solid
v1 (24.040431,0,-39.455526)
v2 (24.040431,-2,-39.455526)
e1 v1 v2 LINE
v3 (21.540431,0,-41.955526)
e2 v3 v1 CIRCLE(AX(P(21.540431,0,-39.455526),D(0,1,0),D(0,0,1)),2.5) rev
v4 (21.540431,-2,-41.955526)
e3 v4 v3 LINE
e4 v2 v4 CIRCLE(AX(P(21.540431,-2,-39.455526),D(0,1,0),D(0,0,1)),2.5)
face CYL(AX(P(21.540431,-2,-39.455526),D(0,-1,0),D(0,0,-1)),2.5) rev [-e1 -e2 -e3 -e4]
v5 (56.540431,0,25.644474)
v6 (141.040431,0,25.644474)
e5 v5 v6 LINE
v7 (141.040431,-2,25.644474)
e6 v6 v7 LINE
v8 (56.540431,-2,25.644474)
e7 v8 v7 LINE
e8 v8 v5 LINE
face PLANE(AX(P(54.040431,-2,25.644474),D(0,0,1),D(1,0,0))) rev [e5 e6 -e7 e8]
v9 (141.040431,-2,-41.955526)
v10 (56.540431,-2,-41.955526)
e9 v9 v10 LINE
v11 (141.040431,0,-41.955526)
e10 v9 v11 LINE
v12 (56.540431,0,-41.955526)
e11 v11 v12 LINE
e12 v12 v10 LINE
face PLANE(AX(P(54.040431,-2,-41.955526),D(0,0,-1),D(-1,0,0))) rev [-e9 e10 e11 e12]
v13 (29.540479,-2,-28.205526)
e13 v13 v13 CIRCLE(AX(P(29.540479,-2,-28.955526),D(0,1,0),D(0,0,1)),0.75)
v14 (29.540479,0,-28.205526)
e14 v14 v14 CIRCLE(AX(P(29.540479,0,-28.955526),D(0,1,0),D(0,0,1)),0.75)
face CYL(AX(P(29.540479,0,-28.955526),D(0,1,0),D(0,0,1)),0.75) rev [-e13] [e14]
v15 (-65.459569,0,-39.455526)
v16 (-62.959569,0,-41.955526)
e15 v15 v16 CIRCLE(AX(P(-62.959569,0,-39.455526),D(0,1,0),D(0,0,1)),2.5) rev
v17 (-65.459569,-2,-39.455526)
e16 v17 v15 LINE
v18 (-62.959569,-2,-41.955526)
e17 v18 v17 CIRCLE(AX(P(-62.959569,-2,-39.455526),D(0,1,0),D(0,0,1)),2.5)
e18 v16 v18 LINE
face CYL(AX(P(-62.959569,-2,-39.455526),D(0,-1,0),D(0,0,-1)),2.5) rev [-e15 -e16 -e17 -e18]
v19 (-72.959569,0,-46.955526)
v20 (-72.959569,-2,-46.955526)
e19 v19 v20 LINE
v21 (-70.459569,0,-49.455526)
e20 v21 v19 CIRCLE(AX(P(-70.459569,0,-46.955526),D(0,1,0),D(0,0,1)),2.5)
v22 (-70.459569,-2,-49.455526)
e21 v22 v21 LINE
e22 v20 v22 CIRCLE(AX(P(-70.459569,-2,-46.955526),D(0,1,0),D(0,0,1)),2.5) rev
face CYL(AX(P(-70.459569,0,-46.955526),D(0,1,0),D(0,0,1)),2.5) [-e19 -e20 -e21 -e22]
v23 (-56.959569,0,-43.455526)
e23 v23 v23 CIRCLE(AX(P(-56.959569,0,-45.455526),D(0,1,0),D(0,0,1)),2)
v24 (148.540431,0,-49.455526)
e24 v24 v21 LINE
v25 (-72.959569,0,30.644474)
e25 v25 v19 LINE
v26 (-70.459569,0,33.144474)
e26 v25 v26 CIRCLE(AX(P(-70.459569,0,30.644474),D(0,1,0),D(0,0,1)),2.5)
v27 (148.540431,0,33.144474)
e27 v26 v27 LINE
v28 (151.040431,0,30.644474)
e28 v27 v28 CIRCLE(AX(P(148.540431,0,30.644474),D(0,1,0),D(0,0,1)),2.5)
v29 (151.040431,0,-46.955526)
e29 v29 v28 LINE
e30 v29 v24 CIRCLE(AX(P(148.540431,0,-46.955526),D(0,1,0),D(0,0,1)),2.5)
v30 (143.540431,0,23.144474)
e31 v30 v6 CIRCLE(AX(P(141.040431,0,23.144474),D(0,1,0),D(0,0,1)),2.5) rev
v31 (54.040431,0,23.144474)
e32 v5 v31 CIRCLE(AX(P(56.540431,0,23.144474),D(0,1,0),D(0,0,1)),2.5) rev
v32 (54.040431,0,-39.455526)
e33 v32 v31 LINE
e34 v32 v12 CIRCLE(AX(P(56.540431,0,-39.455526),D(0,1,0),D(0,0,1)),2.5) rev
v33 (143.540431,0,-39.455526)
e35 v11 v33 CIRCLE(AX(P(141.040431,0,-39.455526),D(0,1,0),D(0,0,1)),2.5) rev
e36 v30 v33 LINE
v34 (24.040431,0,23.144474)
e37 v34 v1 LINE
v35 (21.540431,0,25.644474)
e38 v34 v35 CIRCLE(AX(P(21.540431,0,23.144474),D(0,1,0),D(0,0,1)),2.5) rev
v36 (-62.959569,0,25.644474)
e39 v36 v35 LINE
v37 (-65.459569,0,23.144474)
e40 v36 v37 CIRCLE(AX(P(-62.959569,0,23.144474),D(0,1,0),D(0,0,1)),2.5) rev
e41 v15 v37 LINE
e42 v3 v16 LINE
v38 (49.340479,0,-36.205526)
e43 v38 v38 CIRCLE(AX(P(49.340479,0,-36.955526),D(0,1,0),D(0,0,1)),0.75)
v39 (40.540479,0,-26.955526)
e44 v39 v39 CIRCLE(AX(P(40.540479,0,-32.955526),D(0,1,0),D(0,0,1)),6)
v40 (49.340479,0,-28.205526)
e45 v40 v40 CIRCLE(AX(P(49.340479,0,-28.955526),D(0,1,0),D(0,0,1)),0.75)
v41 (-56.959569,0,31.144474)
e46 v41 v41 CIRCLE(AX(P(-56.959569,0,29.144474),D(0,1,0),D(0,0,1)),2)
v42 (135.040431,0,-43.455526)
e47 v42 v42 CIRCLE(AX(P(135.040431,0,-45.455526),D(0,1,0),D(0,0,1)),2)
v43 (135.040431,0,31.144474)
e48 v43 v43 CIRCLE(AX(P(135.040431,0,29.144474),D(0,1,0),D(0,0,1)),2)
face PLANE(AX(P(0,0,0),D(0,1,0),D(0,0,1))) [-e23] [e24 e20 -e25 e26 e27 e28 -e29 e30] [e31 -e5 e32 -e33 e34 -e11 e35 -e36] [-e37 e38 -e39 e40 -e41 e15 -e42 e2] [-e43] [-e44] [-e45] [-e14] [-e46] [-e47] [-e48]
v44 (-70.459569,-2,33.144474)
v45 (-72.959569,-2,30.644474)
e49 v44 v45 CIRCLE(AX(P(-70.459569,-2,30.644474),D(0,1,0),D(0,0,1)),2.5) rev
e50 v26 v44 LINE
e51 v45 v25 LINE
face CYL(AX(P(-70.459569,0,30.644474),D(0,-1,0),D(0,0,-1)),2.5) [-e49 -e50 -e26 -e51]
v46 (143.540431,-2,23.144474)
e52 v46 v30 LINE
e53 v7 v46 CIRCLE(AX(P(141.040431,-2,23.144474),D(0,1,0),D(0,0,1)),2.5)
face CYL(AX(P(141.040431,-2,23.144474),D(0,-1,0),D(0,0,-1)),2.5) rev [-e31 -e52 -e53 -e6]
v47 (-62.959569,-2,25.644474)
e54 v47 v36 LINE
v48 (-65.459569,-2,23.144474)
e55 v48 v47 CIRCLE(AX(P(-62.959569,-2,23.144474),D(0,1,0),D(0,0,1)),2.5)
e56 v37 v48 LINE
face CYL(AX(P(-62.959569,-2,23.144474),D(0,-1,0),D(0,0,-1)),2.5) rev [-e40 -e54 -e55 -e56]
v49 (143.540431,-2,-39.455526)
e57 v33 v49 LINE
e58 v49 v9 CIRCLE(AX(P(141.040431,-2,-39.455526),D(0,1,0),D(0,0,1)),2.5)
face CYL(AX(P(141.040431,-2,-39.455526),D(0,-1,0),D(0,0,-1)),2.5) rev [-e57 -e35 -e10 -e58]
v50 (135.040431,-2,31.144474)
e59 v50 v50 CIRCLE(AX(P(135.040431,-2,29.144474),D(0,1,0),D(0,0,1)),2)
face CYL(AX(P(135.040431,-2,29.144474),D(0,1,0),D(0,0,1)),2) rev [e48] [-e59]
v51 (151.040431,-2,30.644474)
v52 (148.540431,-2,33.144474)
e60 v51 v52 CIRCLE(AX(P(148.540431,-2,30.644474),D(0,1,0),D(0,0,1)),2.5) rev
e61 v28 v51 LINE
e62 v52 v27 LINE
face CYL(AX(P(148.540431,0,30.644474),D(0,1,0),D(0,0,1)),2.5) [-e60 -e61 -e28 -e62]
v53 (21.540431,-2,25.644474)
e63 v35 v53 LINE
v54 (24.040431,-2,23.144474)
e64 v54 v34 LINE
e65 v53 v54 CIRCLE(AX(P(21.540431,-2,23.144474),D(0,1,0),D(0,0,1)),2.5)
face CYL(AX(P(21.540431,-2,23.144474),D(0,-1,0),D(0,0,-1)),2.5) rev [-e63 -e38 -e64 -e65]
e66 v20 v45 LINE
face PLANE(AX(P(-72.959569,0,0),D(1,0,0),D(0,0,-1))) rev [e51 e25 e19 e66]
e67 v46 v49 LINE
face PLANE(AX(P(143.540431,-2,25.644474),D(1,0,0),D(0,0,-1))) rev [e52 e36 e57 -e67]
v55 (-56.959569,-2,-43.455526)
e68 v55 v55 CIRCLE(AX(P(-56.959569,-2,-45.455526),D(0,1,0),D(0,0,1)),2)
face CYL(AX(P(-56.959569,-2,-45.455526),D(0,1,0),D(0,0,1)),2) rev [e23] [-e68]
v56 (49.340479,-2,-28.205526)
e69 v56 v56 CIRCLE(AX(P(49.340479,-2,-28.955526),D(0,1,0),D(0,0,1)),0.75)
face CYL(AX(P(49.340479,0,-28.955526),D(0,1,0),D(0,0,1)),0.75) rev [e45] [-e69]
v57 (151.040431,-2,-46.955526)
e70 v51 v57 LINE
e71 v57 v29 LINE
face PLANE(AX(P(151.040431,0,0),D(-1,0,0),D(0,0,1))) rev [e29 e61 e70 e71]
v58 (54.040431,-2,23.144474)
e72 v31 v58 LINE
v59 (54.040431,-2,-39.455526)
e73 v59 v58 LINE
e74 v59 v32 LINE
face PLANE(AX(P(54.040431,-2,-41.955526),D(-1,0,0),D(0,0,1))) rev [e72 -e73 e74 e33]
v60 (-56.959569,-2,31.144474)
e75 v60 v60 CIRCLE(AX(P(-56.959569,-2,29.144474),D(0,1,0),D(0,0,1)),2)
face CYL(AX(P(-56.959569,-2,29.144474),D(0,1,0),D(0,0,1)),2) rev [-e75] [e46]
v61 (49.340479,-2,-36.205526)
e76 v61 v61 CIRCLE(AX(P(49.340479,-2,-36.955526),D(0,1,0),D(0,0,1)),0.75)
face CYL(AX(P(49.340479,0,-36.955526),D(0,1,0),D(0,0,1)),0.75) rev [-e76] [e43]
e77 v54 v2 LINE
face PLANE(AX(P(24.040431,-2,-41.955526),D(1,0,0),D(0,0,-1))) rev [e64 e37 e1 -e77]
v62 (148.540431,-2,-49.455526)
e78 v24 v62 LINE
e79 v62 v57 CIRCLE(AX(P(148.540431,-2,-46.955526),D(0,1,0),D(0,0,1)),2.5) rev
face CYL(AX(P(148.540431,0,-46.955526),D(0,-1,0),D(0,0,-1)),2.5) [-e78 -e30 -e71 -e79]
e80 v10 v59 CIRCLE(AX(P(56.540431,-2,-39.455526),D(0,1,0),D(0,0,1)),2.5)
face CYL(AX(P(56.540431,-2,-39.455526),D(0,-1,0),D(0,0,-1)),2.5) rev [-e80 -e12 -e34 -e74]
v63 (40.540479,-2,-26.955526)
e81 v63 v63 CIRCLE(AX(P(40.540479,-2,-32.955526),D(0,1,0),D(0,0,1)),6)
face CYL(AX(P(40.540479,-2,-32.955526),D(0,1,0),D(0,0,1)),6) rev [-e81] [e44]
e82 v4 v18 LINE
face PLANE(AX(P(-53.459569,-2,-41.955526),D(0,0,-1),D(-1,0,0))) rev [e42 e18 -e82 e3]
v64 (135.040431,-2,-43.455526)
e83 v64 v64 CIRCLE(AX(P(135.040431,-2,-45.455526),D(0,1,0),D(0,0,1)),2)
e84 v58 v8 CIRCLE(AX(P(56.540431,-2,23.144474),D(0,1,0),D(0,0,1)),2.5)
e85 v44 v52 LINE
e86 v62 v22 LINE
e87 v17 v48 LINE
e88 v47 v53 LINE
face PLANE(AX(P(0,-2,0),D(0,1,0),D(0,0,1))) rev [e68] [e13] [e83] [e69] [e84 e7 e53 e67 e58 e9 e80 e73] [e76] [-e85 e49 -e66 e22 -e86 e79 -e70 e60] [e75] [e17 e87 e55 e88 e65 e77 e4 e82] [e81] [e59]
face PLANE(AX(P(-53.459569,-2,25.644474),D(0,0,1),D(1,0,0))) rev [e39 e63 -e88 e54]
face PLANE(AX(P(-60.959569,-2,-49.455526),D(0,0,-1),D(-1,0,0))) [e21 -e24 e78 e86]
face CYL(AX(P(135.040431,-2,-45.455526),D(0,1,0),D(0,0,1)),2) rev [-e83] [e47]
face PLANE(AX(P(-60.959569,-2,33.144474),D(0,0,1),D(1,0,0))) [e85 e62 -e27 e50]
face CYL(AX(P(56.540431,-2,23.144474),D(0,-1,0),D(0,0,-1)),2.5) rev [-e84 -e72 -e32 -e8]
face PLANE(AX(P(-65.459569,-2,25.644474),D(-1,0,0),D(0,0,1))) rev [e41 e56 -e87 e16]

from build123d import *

# Parameters (mm, degrees)
SKETCH1_W             = 200
SKETCH1_H             = 82.6
BASE_FLANGE1_DEPTH    = 2
SKETCH6_R             = 2
CUT_EXTRUDE1_DEPTH    = 148.587569056
SKETCH7_W             = 77.5
SKETCH7_H             = 67.6
CUT_EXTRUDE2_DEPTH    = 148.587569056
SKETCH8_W             = 82.6
SKETCH8_H             = 2
BOSS_EXTRUDE1_DEPTH   = 12
SKETCH9_W             = 82.6
SKETCH9_H             = 2
BOSS_EXTRUDE2_DEPTH   = 12
SKETCH10_W            = 12
SKETCH10_H            = 67.6
CUT_EXTRUDE3_DEPTH    = 159.943577694
FILLET1_R             = 2.5
SKETCH11_R            = 6
CUT_EXTRUDE4_DEPTH    = 159.943577694
F_1_5MM_DOWEL_HOLE1_D = 1.5


# Sheet-metal steps are written as plain solids
with BuildPart() as part:
    # Sketch1 → Base-Flange1 (new body)
    with BuildSketch(Plane(origin=(0, 0, 0), x_dir=(1, 0, 0), z_dir=(0, 1, 0))):
        with Locations((39.040431267, 8.155525606)):
            Rectangle(SKETCH1_W, SKETCH1_H)
    extrude(amount=-BASE_FLANGE1_DEPTH)

    # Sketch6 → Cut-Extrude1 (cut, through all)
    with BuildSketch(Plane(origin=(0, 0, 0), x_dir=(1, 0, 0), z_dir=(0, 1, 0))):
        with Locations(Location((-56.959568733, 45.455525606, 0), (0, 0, 270))):
            Circle(SKETCH6_R)
        with Locations(Location((-56.959568733, -29.144474394, 0), (0, 0, 270))):
            Circle(SKETCH6_R)
        with Locations(Location((135.040431267, -29.144474394, 0), (0, 0, 270))):
            Circle(SKETCH6_R)
        with Locations(Location((135.040431267, 45.455525606, 0), (0, 0, 270))):
            Circle(SKETCH6_R)
    extrude(amount=-CUT_EXTRUDE1_DEPTH, mode=Mode.SUBTRACT)

    # Sketch7 → Cut-Extrude2 (cut, through all)
    with BuildSketch(Plane(origin=(0, 0, 0), x_dir=(1, 0, 0), z_dir=(0, 1, 0))):
        with Locations((-14.709568733, 8.155525606)):
            Rectangle(SKETCH7_W, SKETCH7_H)
        with Locations((92.790431267, 8.155525606)):
            Rectangle(SKETCH7_W, SKETCH7_H)
    extrude(amount=-CUT_EXTRUDE2_DEPTH, mode=Mode.SUBTRACT)

    # Sketch8 → Boss-Extrude1 (add)
    with BuildSketch(Plane.ZY.offset(60.959568733)):
        with Locations((-8.155525606, -1)):
            Rectangle(SKETCH8_W, SKETCH8_H)
    extrude(amount=BOSS_EXTRUDE1_DEPTH)

    # Sketch9 → Boss-Extrude2 (add)
    with BuildSketch(Plane(origin=(139.040431267, 0, 0), x_dir=(0, 0, -1), z_dir=(1, 0, 0))):
        with Locations((8.155525606, -1)):
            Rectangle(SKETCH9_W, SKETCH9_H)
    extrude(amount=BOSS_EXTRUDE2_DEPTH)

    # Sketch10 → Cut-Extrude3 (cut, through all)
    with BuildSketch(Plane(origin=(0, 0, 0), x_dir=(1, 0, 0), z_dir=(0, 1, 0))):
        with Locations((-59.459568733, 8.155525606)):
            Rectangle(SKETCH10_W, SKETCH10_H)
        with Locations((137.540431267, 8.155525606)):
            Rectangle(SKETCH10_W, SKETCH10_H)
    extrude(amount=-CUT_EXTRUDE3_DEPTH, mode=Mode.SUBTRACT)

    # Fillet1
    fillet1_edges = [part.edges().sort_by_distance(p)[0] for p in [
        (-65.459568733, -1, 25.644474394),
        (-65.459568733, -1, -41.955525606),
        (143.540431267, -1, -41.955525606),
        (143.540431267, -1, 25.644474394),
        (24.040431267, -1, -41.955525606),
        (24.040431267, -1, 25.644474394),
        (54.040431267, -1, 25.644474394),
        (54.040431267, -1, -41.955525606),
        (-72.959568733, -1, -49.455525606),
        (-72.959568733, -1, 33.144474394),
        (151.040431267, -1, -49.455525606),
        (151.040431267, -1, 33.144474394),
    ]]
    fillet(fillet1_edges, radius=FILLET1_R)

    # Sketch11 → Cut-Extrude4 (cut, through all)
    with BuildSketch(Plane(origin=(0, 0, 0), x_dir=(1, 0, 0), z_dir=(0, 1, 0))):
        with Locations(Location((40.540479107, 32.955525606, 0), (0, 0, 270))):
            Circle(SKETCH11_R)
    extrude(amount=-CUT_EXTRUDE4_DEPTH, mode=Mode.SUBTRACT)

    # Ø1.5mm Dowel Hole1 (through all)
    with Locations(Plane(origin=(0, 0, 0), x_dir=(1, 0, 0), z_dir=(0, 1, 0))):
        with Locations((49.340479107, 36.955525606), (49.340479107, 28.955525606), (29.540479107, 28.955525606)):
            Hole(F_1_5MM_DOWEL_HOLE1_D / 2)


solid = part.part
